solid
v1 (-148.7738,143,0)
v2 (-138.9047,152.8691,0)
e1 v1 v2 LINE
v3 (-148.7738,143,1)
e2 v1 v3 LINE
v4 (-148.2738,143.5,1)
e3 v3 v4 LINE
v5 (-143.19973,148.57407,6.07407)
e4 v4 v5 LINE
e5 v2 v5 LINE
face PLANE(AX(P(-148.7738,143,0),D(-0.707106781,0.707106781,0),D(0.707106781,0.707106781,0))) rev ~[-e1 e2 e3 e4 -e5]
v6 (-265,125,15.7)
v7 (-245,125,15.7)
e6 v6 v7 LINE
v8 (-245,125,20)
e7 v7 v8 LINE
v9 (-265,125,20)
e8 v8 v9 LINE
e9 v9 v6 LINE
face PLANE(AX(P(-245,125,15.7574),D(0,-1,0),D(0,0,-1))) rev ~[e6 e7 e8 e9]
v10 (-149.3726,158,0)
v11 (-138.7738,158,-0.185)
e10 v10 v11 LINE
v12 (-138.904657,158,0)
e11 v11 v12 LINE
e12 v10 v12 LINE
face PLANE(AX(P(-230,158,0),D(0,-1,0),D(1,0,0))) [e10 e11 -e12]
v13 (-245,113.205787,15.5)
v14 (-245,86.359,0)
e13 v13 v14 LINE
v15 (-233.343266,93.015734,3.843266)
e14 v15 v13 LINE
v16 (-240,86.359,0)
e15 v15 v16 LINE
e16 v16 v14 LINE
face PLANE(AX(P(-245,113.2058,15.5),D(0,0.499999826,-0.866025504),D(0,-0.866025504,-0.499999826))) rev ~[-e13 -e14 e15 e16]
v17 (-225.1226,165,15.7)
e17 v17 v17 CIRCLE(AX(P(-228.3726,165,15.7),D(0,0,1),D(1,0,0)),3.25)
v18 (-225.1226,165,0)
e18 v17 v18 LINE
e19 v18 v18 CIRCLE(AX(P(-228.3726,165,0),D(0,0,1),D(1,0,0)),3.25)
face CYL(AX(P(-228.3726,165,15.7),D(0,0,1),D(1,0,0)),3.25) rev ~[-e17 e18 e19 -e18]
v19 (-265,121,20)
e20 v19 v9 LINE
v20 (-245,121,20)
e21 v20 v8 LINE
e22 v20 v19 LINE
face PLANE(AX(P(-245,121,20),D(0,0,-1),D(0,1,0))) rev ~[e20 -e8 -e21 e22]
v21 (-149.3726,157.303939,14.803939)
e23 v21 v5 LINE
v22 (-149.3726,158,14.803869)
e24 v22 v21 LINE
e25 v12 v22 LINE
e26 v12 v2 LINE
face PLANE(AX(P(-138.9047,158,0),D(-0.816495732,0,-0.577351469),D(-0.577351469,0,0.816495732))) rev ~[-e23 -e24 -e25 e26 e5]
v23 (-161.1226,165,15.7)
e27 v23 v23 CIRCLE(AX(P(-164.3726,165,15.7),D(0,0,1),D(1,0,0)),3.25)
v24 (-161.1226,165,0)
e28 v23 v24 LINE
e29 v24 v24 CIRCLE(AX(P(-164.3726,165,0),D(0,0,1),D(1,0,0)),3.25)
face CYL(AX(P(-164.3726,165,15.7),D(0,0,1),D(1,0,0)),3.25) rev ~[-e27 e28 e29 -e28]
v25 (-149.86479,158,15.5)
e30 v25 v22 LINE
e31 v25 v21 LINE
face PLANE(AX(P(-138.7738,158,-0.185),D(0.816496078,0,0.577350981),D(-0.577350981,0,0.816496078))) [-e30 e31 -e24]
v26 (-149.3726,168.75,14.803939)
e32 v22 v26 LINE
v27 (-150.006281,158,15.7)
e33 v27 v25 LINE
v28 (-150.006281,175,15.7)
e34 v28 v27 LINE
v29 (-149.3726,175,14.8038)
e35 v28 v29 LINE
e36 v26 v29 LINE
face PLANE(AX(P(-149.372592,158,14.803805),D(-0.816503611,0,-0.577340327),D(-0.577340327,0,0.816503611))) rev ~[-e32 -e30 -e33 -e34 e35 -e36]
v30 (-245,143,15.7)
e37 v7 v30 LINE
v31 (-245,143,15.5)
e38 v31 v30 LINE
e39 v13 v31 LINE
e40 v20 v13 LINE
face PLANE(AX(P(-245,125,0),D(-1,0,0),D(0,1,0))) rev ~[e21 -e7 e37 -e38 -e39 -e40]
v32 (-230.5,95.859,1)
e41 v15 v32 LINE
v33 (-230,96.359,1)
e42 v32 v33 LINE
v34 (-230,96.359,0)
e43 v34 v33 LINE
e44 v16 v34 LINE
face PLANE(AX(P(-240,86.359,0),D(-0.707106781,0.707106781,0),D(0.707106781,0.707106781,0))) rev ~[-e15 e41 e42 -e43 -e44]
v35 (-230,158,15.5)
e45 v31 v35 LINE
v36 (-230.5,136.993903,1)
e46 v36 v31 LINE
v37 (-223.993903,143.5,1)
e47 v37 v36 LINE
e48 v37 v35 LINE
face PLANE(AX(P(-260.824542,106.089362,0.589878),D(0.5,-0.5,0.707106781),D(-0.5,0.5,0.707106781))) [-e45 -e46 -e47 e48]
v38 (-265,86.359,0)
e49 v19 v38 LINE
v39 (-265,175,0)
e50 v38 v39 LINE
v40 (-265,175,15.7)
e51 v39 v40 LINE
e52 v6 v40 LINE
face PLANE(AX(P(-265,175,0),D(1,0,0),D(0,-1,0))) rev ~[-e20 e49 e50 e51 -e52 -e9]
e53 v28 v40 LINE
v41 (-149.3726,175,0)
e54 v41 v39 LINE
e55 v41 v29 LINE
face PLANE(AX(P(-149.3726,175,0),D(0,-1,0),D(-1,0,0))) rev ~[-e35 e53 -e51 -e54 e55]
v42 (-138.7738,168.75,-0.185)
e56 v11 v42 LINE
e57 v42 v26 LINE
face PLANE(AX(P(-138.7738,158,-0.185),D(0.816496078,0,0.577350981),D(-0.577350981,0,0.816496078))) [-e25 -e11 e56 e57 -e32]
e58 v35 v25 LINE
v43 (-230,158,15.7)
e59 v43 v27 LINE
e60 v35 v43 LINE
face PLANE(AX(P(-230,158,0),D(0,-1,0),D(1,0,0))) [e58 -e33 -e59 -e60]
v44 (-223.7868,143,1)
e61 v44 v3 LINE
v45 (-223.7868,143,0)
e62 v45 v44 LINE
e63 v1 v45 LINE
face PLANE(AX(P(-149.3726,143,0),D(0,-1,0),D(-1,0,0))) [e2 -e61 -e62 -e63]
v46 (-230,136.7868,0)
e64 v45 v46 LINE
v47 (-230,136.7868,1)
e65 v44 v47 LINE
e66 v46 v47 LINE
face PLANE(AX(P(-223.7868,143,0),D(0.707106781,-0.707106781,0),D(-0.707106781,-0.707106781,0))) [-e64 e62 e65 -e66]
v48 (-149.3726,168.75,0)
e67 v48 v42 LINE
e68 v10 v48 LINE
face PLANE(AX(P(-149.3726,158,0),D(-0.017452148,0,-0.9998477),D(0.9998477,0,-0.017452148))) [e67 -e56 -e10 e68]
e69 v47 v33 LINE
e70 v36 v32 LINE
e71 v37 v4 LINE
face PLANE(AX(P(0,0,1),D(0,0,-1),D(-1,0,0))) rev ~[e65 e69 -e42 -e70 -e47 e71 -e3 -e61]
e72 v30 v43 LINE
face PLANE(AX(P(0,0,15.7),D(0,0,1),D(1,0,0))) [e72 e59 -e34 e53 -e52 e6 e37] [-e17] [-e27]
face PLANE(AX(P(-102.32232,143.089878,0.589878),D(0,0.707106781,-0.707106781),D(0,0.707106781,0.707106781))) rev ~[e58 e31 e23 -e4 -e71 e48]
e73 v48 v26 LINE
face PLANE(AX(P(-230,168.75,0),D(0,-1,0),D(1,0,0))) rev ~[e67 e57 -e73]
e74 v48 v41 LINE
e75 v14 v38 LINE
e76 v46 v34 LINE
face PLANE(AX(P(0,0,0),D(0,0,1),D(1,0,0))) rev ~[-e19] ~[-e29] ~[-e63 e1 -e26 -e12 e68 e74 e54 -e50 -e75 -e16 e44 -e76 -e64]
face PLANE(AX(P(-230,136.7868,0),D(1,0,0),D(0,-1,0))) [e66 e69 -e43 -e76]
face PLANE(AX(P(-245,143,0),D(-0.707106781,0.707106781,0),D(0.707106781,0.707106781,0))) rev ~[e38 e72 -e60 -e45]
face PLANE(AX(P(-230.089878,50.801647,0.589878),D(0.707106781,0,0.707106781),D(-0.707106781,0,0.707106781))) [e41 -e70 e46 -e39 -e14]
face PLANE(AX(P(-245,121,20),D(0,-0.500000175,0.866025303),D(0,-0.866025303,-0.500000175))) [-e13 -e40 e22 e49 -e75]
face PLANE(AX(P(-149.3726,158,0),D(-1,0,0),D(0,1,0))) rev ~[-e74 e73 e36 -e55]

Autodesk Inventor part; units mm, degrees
ref_plane "YZ Plane" through (0, 0, 0) normal (1, 0, 0) x (0, 1, 0)
ref_plane "XZ Plane" through (0, 0, 0) normal (0, 1, 0) x (-1, 0, 0)
ref_plane "РабПлоскость1" through (0, 0, 0) normal (0, 0, 1) x (1, 0, 0)
sketch "Эскиз1" plane through (0, 0, 0) normal (0, 0, 1) x (1, 0, 0)
  line L0 (265, 175) -> (-265, 175)
  line L1 (-265, 175) -> (-265, -175)
  line L2 (-265, 125) -> (-245, 125)
  line L3 (-245, 125) -> (-245, 143)
  line L4 (-245, 143) -> (-230, 158)
  line L5 (-230, 158) -> (-149.3726, 158)
  line L6 (-149.3726, 158) -> (-149.3726, 178)
  point P0 (0, 0)
  point P1 (-149.3726, 175)
extrude "Выдавливание1" add sketch "Эскиз1" along normal blind 15.7
sketch "Эскиз2" plane through (-245, 125, 0) normal (1, 0, 0) x (0, 0, -1)
  line L0 (0, 0) -> (-15.7, 0) projected
  line L1 (-20, -4) -> (0, -38.641) projected
  line L2 (-20, -4) -> (-20, 0) projected
  line L3 (0, 50) -> (0, -300) projected
  line L4 (-20, 0) -> (-15.7574, 0) projected
  line L5 (-20, 0) -> (0, 0)
  line L6 (0, -38.641) -> (0, 0)
  point P0 (0, -125)
  point P1 (-1, -36.909)
  point P2 (-1, 0)
  point P3 (-1, 0)
ref_plane "РабПлоскость2" through (-265, -125, -86) normal (1, 0, 0) x (0, 1, 0)
extrude "Выдавливание2" add sketch "Эскиз2" against normal up to surface (20 mm away)
sketch "Эскиз3" plane through (-230, 158, 0) normal (0, -1, 0) x (1, 0, 0)
  line L0 (91.2262, -0.185) -> (79.9532, 15.7574) projected
  line L1 (80.6274, 0) -> (80.6274, 15.7) projected
  line L2 (0, 0) -> (80.6274, 0) projected
  line L3 (80.6274, 0) -> (91.2262, -0.185)
  point P0 (230, 0)
  point P1 (80.6274, 14.8038)
extrude "Выдавливание3" add sketch "Эскиз3" against normal blind 10.75
sketch "Эскиз4" plane through (0, 0, 0) normal (0, 0, -1) x (-1, 0, 0)
  line L0 (245, 143) -> (230, 158) projected
  line L1 (230, 158) -> (149.3726, 158) projected
  line L2 (245, 86.359) -> (245, 143) projected
  line L3 (149.3726, 158) -> (138.7738, 158) projected
  line L4 (148.7738, 143) -> (149.3726, 143)
  line L5 (149.3726, 143) -> (223.7868, 143)
  line L6 (223.7868, 143) -> (230, 136.7868)
  line L7 (230, 136.7868) -> (230, 96.359)
  line L8 (138.7738, 153) -> (138.7738, 158)
  line L9 (240, 86.359) -> (245, 86.359)
  line L10 (240, 86.359) -> (230, 96.359)
  line L11 (148.7738, 143) -> (138.7738, 153)
  point P0 (0, 0)
  point P1 (138.7738, 143)
  point P2 (230, 86.359)
  point P3 (245, 88.091)
  dimension "d6" = 15
  dimension "d7" = 10
  dimension "d8" = 10
  dimension "d9" = 10
  dimension "d10" = 10
extrude "Выдавливание4" add sketch "Эскиз4" against normal blind 1
chamfer "Фаска1" distance 14.5 angle 45 3 edges at (-237.5, 150.5, 1) (-184.8059, 158, 1) (-245, 115.5455, 1)
sketch "Эскиз5" plane through (-245, 86.359, 15.5) normal (-1, 0, 0) x (0, 0, 1)
  point P0 (-15.5, -86.359)
sketch "Эскиз6" plane through (-245, 86.359, 15.5) normal (-1, 0, 0) x (0, 0, 1)
  line L0 (-15.5, 0) -> (0, 0) projected
  line L1 (0, 26.8468) -> (-15.5, 0) projected
  line L2 (0, 26.8468) -> (0, 0) projected
  point P0 (-15.5, -86.359)
extrude "Выдавливание5" cut sketch "Эскиз6" against normal blind 19.5
sketch "Эскиз7" plane through (-149.3726, 158, 15.5) normal (0, 1, 0) x (1, 0, 0)
  line L0 (10.5987, 15.5) -> (10.5987, 0) projected
  line L1 (10.4679, 15.5) -> (10.5987, 15.5) projected
  line L2 (10.4679, 15.5) -> (0, 0.6962) projected
  line L3 (0, 0.6962) -> (0, 0) projected
  line L4 (0, 0) -> (10.5987, 0) projected
  point P0 (149.3726, 15.5)
extrude "Выдавливание6" cut sketch "Эскиз7" against normal blind 19.5
sketch "Эскиз8" plane through (0, 0, 15.7) normal (0, 0, 1) x (1, 0, 0)
  circle A0 centre (-164.3726, 165) radius 3.25 projected
  circle A1 centre (-228.3726, 165) radius 3.25 projected
  point P0 (0, 0)
extrude "Выдавливание7" cut sketch "Эскиз8" against normal blind 28.75
sketch "Эскиз9" plane through (-230, 158, 15.7) normal (0, -1, 0) x (1, 0, 0)
  line L0 (86.8003, -9.6259) -> (80.6274, -0.8962) projected
  line L1 (81.7345, -2.4619) -> (79.5689, 0.6008)
  line L2 (79.5689, 0.6008) -> (81.1742, 0.6008)
  line L3 (81.1742, 0.6008) -> (81.1742, -1.6694)
  point P0 (230, -15.7)
  point P1 (80.6274, -0.8962)
  point P2 (81.1742, -1.6694)
extrude "Выдавливание8" cut sketch "Эскиз9" along normal through all both and the other way through all
equation "\"d8\" = d7"
equation "\"d9\" = d7"
equation "\"d10\" = d9"
properties part number "Накладка_левая"
